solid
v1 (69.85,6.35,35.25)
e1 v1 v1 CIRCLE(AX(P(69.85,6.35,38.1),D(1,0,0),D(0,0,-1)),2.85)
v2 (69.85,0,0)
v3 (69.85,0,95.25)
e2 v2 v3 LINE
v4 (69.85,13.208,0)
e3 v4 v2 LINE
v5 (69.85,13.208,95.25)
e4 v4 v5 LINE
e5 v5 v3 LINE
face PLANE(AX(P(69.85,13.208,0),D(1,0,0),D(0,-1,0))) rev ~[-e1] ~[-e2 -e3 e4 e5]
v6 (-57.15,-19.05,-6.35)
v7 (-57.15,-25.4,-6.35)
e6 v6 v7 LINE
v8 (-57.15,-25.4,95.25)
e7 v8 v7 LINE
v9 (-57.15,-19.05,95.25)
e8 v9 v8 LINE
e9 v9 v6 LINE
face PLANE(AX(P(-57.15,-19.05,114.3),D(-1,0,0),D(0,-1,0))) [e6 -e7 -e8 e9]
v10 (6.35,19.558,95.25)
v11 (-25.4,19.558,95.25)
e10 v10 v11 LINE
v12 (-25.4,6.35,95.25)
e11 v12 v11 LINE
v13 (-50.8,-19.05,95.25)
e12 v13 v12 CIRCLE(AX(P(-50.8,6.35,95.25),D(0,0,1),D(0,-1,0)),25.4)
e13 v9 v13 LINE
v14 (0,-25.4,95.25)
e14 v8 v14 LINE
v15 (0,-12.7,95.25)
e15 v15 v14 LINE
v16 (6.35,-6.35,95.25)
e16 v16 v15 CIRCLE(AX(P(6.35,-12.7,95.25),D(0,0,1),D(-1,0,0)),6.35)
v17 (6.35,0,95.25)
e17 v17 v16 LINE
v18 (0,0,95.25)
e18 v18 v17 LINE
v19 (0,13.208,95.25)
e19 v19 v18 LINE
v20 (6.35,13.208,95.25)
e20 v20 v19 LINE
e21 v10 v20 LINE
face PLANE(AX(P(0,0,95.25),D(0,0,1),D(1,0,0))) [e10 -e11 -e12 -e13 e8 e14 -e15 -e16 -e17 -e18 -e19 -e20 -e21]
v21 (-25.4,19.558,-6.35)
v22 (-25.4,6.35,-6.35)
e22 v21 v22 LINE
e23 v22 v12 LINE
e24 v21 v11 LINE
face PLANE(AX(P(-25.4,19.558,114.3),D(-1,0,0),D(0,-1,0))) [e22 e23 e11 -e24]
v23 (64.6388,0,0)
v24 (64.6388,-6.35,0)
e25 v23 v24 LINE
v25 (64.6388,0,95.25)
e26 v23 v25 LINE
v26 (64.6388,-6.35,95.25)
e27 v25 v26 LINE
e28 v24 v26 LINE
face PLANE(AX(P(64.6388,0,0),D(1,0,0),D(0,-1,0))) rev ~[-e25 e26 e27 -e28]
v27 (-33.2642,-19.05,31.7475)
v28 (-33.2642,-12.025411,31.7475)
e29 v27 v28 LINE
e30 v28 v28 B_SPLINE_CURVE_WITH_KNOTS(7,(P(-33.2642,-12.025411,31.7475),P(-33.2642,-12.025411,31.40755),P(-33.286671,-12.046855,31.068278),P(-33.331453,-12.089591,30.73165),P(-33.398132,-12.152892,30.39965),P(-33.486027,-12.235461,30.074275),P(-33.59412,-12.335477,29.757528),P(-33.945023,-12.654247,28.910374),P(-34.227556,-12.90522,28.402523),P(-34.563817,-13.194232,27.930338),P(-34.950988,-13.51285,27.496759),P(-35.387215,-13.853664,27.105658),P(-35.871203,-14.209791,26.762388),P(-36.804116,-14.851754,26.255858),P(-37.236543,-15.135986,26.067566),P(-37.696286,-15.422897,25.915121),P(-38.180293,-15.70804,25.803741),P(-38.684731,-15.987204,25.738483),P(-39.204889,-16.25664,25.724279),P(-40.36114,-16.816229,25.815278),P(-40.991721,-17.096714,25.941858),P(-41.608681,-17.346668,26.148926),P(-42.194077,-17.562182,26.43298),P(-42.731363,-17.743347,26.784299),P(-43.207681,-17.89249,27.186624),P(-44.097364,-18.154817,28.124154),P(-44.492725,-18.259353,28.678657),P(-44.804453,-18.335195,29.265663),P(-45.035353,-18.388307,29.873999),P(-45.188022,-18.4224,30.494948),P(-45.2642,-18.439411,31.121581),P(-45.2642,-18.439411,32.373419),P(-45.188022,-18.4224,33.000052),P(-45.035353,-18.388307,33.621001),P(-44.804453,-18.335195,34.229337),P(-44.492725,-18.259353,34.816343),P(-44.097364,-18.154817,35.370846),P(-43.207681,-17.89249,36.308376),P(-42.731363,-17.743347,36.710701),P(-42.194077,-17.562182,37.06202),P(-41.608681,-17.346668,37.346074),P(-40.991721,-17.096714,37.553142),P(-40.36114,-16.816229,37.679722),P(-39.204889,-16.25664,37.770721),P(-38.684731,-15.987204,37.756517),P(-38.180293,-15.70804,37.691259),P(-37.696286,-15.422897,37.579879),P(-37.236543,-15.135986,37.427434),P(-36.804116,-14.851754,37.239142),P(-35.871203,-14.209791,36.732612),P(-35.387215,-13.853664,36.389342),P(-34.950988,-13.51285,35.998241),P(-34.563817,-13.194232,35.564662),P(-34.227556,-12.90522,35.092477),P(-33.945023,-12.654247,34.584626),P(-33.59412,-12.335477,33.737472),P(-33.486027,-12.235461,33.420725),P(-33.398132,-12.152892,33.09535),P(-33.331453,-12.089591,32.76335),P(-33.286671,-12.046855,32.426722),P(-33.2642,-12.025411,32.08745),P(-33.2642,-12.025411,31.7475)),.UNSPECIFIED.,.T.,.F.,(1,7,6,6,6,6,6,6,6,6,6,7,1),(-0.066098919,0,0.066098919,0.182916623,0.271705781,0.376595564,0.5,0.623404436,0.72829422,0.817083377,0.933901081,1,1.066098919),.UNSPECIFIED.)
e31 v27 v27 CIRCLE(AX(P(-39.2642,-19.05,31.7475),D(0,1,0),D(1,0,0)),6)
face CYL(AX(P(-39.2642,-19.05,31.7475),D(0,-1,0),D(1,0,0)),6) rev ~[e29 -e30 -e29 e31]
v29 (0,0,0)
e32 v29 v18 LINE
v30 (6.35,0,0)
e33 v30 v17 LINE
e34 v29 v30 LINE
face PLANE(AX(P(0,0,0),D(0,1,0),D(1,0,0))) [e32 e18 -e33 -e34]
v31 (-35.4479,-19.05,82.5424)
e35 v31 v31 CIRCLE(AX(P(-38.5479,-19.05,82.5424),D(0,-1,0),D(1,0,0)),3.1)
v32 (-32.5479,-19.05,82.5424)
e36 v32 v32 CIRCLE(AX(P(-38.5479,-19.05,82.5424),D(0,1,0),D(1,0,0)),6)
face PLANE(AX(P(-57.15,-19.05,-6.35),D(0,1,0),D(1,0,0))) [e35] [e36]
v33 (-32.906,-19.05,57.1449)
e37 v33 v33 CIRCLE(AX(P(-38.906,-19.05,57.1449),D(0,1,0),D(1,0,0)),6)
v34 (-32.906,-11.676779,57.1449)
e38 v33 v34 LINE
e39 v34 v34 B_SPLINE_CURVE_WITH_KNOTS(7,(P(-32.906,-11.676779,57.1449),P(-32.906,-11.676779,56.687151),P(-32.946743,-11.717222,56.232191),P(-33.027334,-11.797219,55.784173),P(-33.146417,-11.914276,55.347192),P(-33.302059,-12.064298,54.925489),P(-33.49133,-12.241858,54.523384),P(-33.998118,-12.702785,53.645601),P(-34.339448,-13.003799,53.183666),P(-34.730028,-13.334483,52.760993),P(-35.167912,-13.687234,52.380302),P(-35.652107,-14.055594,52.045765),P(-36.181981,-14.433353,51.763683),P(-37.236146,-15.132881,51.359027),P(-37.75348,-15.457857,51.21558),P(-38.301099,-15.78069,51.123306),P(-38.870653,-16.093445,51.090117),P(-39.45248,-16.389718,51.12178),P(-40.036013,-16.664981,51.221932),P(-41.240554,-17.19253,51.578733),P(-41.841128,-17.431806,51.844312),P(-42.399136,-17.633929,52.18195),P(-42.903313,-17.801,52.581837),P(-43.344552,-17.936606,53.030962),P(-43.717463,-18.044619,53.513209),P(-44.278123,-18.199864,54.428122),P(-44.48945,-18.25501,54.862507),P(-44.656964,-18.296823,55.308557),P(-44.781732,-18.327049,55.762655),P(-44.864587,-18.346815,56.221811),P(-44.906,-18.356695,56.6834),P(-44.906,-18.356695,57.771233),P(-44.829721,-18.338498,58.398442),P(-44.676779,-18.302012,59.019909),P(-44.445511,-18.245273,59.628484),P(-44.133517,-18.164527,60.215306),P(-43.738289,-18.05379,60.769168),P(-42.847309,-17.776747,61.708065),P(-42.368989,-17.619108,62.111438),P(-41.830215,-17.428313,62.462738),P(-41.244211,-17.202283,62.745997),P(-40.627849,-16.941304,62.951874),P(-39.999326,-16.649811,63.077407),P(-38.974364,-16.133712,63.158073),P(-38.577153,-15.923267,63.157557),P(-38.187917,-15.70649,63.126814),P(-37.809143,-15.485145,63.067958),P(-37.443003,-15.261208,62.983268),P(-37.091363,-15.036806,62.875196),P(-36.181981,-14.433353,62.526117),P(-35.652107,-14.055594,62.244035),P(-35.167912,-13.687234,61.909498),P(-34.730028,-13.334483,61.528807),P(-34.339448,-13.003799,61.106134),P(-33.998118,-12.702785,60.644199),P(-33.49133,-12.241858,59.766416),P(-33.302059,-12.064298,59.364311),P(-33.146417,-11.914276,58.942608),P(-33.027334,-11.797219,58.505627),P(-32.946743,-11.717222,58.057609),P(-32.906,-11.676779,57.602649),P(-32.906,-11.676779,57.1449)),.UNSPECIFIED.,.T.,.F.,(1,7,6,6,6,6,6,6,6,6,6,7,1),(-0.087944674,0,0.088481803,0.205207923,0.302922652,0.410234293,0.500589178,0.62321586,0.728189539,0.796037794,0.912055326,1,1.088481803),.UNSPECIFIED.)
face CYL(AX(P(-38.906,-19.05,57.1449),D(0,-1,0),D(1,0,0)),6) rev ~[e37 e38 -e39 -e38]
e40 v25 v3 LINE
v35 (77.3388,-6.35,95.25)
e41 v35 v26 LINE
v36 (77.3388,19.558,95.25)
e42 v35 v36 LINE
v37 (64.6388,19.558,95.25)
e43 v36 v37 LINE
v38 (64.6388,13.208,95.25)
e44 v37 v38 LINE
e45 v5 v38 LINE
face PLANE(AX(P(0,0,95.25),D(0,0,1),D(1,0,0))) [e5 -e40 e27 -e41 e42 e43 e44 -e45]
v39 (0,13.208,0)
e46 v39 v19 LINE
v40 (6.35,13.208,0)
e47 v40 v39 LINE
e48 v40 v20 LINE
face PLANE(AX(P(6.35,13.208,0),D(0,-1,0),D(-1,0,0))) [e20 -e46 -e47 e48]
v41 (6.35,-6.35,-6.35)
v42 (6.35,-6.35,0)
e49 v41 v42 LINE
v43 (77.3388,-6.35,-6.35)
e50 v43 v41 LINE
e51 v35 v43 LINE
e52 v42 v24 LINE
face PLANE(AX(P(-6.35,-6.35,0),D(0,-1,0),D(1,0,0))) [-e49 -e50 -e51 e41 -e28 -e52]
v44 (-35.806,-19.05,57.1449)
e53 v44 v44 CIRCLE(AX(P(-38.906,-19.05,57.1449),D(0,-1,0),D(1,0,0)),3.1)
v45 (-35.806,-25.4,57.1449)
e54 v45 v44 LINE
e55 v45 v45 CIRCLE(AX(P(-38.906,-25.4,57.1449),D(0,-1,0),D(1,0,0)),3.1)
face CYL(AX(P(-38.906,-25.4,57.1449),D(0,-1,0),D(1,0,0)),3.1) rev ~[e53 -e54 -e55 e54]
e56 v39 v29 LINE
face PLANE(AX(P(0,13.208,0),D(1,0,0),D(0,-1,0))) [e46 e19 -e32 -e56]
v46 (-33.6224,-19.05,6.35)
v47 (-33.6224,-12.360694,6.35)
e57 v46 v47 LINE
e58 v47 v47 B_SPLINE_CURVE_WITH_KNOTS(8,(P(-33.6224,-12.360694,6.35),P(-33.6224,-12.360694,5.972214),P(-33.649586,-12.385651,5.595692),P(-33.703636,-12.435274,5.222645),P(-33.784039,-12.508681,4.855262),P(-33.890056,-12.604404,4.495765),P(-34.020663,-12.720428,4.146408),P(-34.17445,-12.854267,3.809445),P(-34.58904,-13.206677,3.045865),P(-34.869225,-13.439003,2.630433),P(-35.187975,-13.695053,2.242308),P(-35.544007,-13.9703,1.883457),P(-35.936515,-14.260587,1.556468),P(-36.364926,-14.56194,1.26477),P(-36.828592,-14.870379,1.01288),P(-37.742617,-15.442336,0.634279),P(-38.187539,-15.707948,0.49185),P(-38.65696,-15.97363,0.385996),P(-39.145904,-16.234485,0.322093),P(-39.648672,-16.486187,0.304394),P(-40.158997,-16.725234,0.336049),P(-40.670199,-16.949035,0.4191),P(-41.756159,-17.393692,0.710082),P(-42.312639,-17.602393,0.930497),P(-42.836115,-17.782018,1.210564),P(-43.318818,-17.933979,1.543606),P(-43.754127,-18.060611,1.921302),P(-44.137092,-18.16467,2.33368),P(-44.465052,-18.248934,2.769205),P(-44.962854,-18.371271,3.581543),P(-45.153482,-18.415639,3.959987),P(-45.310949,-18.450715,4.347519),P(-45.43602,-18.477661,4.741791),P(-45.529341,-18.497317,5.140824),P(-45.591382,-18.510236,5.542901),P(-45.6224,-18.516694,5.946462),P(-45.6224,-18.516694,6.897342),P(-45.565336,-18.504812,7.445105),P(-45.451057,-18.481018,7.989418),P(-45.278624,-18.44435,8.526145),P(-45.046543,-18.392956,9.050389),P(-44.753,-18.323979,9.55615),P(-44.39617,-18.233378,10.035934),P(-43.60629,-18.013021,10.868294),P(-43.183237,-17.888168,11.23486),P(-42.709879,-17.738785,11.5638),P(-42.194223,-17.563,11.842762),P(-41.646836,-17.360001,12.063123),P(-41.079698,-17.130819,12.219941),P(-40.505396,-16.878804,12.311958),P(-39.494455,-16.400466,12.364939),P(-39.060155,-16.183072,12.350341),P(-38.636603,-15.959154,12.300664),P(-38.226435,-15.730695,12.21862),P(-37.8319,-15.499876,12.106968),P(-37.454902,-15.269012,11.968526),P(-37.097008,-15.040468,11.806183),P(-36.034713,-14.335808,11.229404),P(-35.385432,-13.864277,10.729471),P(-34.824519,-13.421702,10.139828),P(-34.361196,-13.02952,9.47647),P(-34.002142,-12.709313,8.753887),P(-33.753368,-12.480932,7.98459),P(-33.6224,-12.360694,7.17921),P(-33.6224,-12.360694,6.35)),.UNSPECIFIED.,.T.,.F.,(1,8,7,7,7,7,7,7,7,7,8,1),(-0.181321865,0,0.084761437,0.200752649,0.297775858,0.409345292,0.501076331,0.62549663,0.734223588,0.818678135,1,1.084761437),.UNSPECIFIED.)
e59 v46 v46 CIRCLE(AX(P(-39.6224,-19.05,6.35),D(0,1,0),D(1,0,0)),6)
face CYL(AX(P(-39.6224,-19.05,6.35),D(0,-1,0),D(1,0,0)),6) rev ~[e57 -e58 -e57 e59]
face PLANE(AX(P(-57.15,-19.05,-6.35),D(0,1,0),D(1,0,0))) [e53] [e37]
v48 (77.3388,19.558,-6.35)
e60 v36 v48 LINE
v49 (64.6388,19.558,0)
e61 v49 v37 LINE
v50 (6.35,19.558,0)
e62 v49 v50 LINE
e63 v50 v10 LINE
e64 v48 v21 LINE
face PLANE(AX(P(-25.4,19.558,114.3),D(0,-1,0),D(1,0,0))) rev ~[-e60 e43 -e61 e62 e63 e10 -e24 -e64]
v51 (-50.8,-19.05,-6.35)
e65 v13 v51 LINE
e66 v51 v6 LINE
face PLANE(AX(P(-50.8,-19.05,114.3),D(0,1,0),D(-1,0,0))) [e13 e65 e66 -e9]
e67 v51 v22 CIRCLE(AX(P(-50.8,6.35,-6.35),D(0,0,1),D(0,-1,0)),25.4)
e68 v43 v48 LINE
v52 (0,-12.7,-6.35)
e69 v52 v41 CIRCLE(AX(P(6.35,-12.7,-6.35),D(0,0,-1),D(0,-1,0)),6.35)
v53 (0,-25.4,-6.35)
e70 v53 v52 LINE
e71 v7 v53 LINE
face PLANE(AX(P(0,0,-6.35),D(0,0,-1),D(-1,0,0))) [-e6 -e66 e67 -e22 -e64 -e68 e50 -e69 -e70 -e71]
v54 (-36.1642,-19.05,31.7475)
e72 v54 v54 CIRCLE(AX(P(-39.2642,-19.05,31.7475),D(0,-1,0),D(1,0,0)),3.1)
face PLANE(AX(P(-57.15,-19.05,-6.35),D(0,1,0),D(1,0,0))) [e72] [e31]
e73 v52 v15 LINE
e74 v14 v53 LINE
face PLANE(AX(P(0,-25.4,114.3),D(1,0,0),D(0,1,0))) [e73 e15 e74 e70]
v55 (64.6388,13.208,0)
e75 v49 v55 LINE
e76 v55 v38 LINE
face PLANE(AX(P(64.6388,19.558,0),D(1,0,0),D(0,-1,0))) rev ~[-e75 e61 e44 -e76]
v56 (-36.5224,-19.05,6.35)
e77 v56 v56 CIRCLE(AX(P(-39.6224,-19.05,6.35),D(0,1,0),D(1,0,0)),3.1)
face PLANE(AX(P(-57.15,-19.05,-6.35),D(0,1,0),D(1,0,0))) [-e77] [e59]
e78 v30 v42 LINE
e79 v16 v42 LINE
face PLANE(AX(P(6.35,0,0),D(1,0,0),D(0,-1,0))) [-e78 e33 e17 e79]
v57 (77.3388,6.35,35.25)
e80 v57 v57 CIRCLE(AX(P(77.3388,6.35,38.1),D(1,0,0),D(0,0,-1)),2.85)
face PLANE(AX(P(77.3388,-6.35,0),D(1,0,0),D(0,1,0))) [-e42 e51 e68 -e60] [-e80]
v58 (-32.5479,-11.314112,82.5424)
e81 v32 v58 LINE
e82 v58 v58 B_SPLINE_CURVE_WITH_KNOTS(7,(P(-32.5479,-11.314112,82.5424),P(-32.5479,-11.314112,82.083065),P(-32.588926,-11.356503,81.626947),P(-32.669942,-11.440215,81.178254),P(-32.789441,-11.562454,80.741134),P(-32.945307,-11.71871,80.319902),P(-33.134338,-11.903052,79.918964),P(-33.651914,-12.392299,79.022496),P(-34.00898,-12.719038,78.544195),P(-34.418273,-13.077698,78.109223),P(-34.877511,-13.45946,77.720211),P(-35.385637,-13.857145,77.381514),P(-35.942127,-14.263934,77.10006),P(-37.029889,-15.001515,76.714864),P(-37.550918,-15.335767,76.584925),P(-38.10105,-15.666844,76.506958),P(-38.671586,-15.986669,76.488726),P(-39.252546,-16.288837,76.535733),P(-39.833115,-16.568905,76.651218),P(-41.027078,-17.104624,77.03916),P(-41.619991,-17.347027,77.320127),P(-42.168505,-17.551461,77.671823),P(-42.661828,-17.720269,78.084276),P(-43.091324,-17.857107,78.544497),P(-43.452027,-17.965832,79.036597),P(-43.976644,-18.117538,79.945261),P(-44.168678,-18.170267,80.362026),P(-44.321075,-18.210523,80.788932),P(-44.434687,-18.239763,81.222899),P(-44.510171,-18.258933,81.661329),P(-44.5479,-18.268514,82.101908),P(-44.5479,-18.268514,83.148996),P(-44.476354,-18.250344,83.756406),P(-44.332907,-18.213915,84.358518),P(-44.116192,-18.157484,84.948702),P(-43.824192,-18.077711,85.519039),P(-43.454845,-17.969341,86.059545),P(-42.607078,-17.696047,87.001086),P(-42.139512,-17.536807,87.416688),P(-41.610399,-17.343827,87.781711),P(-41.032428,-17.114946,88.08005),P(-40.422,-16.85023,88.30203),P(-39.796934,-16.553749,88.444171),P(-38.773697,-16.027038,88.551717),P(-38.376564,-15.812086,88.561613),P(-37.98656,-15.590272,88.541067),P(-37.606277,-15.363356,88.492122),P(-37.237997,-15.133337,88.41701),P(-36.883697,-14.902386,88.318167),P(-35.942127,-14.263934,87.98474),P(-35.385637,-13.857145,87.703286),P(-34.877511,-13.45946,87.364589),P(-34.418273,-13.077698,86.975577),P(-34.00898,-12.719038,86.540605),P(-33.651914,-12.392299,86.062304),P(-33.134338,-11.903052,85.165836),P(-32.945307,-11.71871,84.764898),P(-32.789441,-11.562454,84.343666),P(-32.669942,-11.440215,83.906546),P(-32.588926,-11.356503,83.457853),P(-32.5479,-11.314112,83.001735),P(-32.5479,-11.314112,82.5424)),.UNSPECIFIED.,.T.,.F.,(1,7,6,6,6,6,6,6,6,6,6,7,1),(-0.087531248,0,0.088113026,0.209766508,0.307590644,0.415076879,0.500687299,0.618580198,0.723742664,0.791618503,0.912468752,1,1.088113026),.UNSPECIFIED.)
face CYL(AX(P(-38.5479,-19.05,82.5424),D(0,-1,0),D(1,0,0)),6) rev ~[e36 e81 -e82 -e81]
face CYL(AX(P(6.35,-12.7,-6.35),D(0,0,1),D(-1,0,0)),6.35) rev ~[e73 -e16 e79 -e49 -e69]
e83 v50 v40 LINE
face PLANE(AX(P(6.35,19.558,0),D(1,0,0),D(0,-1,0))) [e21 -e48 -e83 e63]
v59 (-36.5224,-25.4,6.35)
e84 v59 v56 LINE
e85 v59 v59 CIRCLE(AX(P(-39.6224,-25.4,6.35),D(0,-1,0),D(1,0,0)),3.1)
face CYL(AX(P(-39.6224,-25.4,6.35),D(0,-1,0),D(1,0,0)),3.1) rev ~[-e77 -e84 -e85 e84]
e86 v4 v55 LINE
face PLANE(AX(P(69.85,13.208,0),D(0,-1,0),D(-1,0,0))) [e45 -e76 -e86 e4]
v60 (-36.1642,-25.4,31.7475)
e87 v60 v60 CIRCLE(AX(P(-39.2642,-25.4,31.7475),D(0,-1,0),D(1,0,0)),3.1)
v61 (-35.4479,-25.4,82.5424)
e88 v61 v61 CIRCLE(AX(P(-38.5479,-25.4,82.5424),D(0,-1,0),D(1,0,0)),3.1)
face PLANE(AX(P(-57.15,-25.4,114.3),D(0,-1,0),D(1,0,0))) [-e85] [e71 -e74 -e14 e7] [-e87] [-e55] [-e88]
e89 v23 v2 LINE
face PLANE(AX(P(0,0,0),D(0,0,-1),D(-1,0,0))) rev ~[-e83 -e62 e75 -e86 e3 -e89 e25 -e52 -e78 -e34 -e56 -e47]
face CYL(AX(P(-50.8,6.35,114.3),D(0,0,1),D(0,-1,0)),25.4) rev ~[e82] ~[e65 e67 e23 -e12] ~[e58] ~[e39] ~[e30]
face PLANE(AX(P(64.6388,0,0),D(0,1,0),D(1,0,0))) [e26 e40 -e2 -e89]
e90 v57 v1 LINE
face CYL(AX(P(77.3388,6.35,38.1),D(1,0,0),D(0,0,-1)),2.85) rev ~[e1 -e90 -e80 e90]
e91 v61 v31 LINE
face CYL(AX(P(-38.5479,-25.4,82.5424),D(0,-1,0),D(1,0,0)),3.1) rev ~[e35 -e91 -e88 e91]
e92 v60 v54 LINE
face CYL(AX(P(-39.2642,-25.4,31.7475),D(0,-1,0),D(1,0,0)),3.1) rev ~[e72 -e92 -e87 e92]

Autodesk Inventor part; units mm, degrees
ref_plane "YZ Plane" through (0, 0, 0) normal (1, 0, 0) x (0, 1, 0)
ref_plane "XZ Plane" through (0, 0, 0) normal (0, 1, 0) x (-1, 0, 0)
ref_plane "XY Plane" through (0, 0, 0) normal (0, 0, 1) x (1, 0, 0)
sketch "Sketch1" plane through (0, 0, 0) normal (0, 0, 1) x (1, 0, 0)
  line L0 (77.3388, 19.558) -> (77.3388, -6.35)
  line L1 (-6.35, -6.35) -> (-6.35, 19.558)
  line L2 (6.35, 19.558) -> (6.35, 13.208)
  line L3 (0, 13.208) -> (0, 0)
  line L4 (6.35, 0) -> (6.35, -6.35)
  line L5 (69.85, 13.208) -> (69.85, 0)
  line L6 (64.6388, 19.558) -> (64.6388, 13.208)
  line L7 (64.6388, 0) -> (64.6388, -6.35)
  line L8 (-6.35, 19.558) -> (6.35, 19.558)
  line L9 (64.6388, 19.558) -> (77.3388, 19.558)
  line L10 (69.85, 13.208) -> (64.6388, 13.208)
  line L11 (6.35, 13.208) -> (0, 13.208)
  line L12 (0, 0) -> (6.35, 0)
  line L13 (64.6388, 0) -> (69.85, 0)
  line L14 (77.3388, -6.35) -> (64.6388, -6.35)
  line L15 (6.35, -6.35) -> (-6.35, -6.35)
  dimension "d0" = 69.85
  dimension "d1" = 13.208
  dimension "d3" = 12.7
  dimension "d4" = 12.7
extrude "Extrusion1" add sketch "Sketch1" along normal blind 114.3
sketch "Sketch2" plane through (0, 0, 0) normal (0, 0, -1) x (-1, 0, 0)
  line L0 (-77.3388, 19.558) -> (-64.6388, 19.558) projected
  line L1 (6.35, -6.35) -> (-77.3388, -6.35)
  line L2 (-77.3388, -6.35) -> (-77.3388, 19.558)
  line L3 (-77.3388, 19.558) -> (6.35, 19.558)
  line L4 (6.35, 19.558) -> (25.4, 19.558)
  line L5 (25.4, 19.558) -> (25.4, -6.35)
  line L6 (25.4, -6.35) -> (6.35, -6.35)
  point P0 (0, 0)
  dimension "d46" = 19.05
extrude "Extrusion2" add sketch "Sketch2" along normal blind 6.35
sketch "Sketch3" plane through (0, 0, 114.3) normal (0, 0, 1) x (1, 0, 0)
  line L0 (-25.4, 19.558) -> (77.3388, 19.558) projected
  line L1 (0, 19.558) -> (-6.35, 19.558)
  line L2 (-57.15, -19.05) -> (-57.15, -25.4)
  line L3 (-57.15, -25.4) -> (0, -25.4)
  line L4 (0, -25.4) -> (0, 19.558)
  line L5 (-6.35, 19.558) -> (-6.35, 6.35)
  line L6 (6.35, 0) -> (0, 0) projected
  line L7 (-6.35, 19.558) -> (-25.4, 19.558)
  line L8 (-25.4, 19.558) -> (-25.4, 6.35)
  line L9 (-50.8, -19.05) -> (-57.15, -19.05)
  arc A0 (-50.8, -19.05) -> (-25.4, 6.35) centre (-50.8, 6.35) ccw
  point P0 (-6.35, -6.35)
  point P1 (-6.35, -19.05)
  dimension "d9" = 57.15
  dimension "d11" = 12.7
  dimension "d40" = 25.4
  dimension "d47" = 25.4
extrude "Extrusion3" add sketch "Sketch3" against normal up to surface (120.65 mm away)
sketch "Sketch4" plane through (-57.15, -25.4, 114.3) normal (0, -1, 0) x (1, 0, 0)
  line L0 (6.35, 0) -> (31.75, 0) construction
  line L1 (19.05, 0) -> (17.3485, -120.65) construction
  line L2 (6.35, -120.65) -> (6.35, -120.65) construction
  circle A0 centre (17.5276, -107.95) radius 3.1
  circle A1 centre (17.8858, -82.5525) radius 3.1
  circle A2 centre (18.244, -57.1551) radius 3.1
  circle A3 centre (18.6021, -31.7576) radius 3.1
  point P0 (57.15, -114.3)
  point P1 (28.347, -120.65)
  dimension "d16" = 6.2
  dimension "d17" = 12.7
  dimension "d20" = 25.4
extrude "Extrusion4" cut sketch "Sketch4" against normal blind 101.6
sketch "Sketch5" plane through (-6.35, 19.558, 114.3) normal (0, 1, 0) x (1, 0, 0)
  circle A0 centre (-33.2724, 107.95) radius 3.1 projected
  circle A1 centre (-33.2724, 107.95) radius 6.5
  line L0 (-33.2724, 107.95) -> (-33.2724, 95.4747) construction
  circle A2 centre (-33.2724, 82.55) radius 6.5
  circle A3 centre (-33.2724, 57.15) radius 6.5
  circle A4 centre (-33.2724, 31.75) radius 6.5
  point P0 (6.35, 114.3)
  dimension "d27" = 13
  dimension "d30" = 25.4
extrude "Extrusion5" [suppressed]
fillet "Fillet1" radius 6.35 1 edges at (0, -6.35, 53.975)
sketch "Sketch6" plane through (0, 0, 114.3) normal (0, 0, 1) x (1, 0, 0)
  line L0 (-57.15, -19.05) -> (-57.15, -25.4) projected
  line L1 (77.3388, 19.558) -> (64.6388, 19.558) projected
  line L2 (-57.15, -25.4) -> (77.3388, -25.4)
  line L3 (77.3388, -25.4) -> (77.3388, 19.558)
  line L4 (77.3388, 19.558) -> (-57.15, 19.558)
  line L5 (-57.15, 19.558) -> (-57.15, -25.4)
  point P0 (0, 0)
extrude "Extrusion6" cut sketch "Sketch6" against normal blind 19.05
sketch "Sketch7" plane through (77.3388, -6.35, -6.35) normal (1, 0, 0) x (0, 0, -1)
  circle A0 centre (-44.45, 12.7) radius 2.85
  line L0 (0, 25.908) -> (0, 0) projected
  line L1 (0, 0) -> (-101.6, 0) projected
  point P0 (-6.35, 6.35)
  dimension "d41" = 5.7
  dimension "d42" = 44.45
  dimension "d43" = 12.7
extrude "Extrusion7" cut sketch "Sketch7" against normal blind 25.4
sketch "Sketch8" plane through (-57.15, -19.05, -6.35) normal (0, 1, 0) x (1, 0, 0)
  line L0 (6.35, 0) -> (0, 0) construction
  line L1 (0, 0) -> (0, -14.734) construction
  line L2 (0, -101.6) -> (0, 0) construction
  circle A0 centre (17.5276, -12.7) radius 3.1 projected
  circle A1 centre (17.5276, -12.7) radius 6
  circle A2 centre (17.8858, -38.0975) radius 3.1 construction
  line L3 (17.5276, -12.7) -> (17.8858, -38.0975) construction
  circle A3 centre (17.8858, -38.0975) radius 6
  circle A4 centre (18.244, -63.4949) radius 6
  circle A5 centre (18.6021, -88.8924) radius 6
  point P0 (57.15, -6.35)
  dimension "d48" = 12
  dimension "d51" = 25.4
extrude "Extrusion8" cut sketch "Sketch8" along normal blind 25.4
properties part number "batterybracket"
